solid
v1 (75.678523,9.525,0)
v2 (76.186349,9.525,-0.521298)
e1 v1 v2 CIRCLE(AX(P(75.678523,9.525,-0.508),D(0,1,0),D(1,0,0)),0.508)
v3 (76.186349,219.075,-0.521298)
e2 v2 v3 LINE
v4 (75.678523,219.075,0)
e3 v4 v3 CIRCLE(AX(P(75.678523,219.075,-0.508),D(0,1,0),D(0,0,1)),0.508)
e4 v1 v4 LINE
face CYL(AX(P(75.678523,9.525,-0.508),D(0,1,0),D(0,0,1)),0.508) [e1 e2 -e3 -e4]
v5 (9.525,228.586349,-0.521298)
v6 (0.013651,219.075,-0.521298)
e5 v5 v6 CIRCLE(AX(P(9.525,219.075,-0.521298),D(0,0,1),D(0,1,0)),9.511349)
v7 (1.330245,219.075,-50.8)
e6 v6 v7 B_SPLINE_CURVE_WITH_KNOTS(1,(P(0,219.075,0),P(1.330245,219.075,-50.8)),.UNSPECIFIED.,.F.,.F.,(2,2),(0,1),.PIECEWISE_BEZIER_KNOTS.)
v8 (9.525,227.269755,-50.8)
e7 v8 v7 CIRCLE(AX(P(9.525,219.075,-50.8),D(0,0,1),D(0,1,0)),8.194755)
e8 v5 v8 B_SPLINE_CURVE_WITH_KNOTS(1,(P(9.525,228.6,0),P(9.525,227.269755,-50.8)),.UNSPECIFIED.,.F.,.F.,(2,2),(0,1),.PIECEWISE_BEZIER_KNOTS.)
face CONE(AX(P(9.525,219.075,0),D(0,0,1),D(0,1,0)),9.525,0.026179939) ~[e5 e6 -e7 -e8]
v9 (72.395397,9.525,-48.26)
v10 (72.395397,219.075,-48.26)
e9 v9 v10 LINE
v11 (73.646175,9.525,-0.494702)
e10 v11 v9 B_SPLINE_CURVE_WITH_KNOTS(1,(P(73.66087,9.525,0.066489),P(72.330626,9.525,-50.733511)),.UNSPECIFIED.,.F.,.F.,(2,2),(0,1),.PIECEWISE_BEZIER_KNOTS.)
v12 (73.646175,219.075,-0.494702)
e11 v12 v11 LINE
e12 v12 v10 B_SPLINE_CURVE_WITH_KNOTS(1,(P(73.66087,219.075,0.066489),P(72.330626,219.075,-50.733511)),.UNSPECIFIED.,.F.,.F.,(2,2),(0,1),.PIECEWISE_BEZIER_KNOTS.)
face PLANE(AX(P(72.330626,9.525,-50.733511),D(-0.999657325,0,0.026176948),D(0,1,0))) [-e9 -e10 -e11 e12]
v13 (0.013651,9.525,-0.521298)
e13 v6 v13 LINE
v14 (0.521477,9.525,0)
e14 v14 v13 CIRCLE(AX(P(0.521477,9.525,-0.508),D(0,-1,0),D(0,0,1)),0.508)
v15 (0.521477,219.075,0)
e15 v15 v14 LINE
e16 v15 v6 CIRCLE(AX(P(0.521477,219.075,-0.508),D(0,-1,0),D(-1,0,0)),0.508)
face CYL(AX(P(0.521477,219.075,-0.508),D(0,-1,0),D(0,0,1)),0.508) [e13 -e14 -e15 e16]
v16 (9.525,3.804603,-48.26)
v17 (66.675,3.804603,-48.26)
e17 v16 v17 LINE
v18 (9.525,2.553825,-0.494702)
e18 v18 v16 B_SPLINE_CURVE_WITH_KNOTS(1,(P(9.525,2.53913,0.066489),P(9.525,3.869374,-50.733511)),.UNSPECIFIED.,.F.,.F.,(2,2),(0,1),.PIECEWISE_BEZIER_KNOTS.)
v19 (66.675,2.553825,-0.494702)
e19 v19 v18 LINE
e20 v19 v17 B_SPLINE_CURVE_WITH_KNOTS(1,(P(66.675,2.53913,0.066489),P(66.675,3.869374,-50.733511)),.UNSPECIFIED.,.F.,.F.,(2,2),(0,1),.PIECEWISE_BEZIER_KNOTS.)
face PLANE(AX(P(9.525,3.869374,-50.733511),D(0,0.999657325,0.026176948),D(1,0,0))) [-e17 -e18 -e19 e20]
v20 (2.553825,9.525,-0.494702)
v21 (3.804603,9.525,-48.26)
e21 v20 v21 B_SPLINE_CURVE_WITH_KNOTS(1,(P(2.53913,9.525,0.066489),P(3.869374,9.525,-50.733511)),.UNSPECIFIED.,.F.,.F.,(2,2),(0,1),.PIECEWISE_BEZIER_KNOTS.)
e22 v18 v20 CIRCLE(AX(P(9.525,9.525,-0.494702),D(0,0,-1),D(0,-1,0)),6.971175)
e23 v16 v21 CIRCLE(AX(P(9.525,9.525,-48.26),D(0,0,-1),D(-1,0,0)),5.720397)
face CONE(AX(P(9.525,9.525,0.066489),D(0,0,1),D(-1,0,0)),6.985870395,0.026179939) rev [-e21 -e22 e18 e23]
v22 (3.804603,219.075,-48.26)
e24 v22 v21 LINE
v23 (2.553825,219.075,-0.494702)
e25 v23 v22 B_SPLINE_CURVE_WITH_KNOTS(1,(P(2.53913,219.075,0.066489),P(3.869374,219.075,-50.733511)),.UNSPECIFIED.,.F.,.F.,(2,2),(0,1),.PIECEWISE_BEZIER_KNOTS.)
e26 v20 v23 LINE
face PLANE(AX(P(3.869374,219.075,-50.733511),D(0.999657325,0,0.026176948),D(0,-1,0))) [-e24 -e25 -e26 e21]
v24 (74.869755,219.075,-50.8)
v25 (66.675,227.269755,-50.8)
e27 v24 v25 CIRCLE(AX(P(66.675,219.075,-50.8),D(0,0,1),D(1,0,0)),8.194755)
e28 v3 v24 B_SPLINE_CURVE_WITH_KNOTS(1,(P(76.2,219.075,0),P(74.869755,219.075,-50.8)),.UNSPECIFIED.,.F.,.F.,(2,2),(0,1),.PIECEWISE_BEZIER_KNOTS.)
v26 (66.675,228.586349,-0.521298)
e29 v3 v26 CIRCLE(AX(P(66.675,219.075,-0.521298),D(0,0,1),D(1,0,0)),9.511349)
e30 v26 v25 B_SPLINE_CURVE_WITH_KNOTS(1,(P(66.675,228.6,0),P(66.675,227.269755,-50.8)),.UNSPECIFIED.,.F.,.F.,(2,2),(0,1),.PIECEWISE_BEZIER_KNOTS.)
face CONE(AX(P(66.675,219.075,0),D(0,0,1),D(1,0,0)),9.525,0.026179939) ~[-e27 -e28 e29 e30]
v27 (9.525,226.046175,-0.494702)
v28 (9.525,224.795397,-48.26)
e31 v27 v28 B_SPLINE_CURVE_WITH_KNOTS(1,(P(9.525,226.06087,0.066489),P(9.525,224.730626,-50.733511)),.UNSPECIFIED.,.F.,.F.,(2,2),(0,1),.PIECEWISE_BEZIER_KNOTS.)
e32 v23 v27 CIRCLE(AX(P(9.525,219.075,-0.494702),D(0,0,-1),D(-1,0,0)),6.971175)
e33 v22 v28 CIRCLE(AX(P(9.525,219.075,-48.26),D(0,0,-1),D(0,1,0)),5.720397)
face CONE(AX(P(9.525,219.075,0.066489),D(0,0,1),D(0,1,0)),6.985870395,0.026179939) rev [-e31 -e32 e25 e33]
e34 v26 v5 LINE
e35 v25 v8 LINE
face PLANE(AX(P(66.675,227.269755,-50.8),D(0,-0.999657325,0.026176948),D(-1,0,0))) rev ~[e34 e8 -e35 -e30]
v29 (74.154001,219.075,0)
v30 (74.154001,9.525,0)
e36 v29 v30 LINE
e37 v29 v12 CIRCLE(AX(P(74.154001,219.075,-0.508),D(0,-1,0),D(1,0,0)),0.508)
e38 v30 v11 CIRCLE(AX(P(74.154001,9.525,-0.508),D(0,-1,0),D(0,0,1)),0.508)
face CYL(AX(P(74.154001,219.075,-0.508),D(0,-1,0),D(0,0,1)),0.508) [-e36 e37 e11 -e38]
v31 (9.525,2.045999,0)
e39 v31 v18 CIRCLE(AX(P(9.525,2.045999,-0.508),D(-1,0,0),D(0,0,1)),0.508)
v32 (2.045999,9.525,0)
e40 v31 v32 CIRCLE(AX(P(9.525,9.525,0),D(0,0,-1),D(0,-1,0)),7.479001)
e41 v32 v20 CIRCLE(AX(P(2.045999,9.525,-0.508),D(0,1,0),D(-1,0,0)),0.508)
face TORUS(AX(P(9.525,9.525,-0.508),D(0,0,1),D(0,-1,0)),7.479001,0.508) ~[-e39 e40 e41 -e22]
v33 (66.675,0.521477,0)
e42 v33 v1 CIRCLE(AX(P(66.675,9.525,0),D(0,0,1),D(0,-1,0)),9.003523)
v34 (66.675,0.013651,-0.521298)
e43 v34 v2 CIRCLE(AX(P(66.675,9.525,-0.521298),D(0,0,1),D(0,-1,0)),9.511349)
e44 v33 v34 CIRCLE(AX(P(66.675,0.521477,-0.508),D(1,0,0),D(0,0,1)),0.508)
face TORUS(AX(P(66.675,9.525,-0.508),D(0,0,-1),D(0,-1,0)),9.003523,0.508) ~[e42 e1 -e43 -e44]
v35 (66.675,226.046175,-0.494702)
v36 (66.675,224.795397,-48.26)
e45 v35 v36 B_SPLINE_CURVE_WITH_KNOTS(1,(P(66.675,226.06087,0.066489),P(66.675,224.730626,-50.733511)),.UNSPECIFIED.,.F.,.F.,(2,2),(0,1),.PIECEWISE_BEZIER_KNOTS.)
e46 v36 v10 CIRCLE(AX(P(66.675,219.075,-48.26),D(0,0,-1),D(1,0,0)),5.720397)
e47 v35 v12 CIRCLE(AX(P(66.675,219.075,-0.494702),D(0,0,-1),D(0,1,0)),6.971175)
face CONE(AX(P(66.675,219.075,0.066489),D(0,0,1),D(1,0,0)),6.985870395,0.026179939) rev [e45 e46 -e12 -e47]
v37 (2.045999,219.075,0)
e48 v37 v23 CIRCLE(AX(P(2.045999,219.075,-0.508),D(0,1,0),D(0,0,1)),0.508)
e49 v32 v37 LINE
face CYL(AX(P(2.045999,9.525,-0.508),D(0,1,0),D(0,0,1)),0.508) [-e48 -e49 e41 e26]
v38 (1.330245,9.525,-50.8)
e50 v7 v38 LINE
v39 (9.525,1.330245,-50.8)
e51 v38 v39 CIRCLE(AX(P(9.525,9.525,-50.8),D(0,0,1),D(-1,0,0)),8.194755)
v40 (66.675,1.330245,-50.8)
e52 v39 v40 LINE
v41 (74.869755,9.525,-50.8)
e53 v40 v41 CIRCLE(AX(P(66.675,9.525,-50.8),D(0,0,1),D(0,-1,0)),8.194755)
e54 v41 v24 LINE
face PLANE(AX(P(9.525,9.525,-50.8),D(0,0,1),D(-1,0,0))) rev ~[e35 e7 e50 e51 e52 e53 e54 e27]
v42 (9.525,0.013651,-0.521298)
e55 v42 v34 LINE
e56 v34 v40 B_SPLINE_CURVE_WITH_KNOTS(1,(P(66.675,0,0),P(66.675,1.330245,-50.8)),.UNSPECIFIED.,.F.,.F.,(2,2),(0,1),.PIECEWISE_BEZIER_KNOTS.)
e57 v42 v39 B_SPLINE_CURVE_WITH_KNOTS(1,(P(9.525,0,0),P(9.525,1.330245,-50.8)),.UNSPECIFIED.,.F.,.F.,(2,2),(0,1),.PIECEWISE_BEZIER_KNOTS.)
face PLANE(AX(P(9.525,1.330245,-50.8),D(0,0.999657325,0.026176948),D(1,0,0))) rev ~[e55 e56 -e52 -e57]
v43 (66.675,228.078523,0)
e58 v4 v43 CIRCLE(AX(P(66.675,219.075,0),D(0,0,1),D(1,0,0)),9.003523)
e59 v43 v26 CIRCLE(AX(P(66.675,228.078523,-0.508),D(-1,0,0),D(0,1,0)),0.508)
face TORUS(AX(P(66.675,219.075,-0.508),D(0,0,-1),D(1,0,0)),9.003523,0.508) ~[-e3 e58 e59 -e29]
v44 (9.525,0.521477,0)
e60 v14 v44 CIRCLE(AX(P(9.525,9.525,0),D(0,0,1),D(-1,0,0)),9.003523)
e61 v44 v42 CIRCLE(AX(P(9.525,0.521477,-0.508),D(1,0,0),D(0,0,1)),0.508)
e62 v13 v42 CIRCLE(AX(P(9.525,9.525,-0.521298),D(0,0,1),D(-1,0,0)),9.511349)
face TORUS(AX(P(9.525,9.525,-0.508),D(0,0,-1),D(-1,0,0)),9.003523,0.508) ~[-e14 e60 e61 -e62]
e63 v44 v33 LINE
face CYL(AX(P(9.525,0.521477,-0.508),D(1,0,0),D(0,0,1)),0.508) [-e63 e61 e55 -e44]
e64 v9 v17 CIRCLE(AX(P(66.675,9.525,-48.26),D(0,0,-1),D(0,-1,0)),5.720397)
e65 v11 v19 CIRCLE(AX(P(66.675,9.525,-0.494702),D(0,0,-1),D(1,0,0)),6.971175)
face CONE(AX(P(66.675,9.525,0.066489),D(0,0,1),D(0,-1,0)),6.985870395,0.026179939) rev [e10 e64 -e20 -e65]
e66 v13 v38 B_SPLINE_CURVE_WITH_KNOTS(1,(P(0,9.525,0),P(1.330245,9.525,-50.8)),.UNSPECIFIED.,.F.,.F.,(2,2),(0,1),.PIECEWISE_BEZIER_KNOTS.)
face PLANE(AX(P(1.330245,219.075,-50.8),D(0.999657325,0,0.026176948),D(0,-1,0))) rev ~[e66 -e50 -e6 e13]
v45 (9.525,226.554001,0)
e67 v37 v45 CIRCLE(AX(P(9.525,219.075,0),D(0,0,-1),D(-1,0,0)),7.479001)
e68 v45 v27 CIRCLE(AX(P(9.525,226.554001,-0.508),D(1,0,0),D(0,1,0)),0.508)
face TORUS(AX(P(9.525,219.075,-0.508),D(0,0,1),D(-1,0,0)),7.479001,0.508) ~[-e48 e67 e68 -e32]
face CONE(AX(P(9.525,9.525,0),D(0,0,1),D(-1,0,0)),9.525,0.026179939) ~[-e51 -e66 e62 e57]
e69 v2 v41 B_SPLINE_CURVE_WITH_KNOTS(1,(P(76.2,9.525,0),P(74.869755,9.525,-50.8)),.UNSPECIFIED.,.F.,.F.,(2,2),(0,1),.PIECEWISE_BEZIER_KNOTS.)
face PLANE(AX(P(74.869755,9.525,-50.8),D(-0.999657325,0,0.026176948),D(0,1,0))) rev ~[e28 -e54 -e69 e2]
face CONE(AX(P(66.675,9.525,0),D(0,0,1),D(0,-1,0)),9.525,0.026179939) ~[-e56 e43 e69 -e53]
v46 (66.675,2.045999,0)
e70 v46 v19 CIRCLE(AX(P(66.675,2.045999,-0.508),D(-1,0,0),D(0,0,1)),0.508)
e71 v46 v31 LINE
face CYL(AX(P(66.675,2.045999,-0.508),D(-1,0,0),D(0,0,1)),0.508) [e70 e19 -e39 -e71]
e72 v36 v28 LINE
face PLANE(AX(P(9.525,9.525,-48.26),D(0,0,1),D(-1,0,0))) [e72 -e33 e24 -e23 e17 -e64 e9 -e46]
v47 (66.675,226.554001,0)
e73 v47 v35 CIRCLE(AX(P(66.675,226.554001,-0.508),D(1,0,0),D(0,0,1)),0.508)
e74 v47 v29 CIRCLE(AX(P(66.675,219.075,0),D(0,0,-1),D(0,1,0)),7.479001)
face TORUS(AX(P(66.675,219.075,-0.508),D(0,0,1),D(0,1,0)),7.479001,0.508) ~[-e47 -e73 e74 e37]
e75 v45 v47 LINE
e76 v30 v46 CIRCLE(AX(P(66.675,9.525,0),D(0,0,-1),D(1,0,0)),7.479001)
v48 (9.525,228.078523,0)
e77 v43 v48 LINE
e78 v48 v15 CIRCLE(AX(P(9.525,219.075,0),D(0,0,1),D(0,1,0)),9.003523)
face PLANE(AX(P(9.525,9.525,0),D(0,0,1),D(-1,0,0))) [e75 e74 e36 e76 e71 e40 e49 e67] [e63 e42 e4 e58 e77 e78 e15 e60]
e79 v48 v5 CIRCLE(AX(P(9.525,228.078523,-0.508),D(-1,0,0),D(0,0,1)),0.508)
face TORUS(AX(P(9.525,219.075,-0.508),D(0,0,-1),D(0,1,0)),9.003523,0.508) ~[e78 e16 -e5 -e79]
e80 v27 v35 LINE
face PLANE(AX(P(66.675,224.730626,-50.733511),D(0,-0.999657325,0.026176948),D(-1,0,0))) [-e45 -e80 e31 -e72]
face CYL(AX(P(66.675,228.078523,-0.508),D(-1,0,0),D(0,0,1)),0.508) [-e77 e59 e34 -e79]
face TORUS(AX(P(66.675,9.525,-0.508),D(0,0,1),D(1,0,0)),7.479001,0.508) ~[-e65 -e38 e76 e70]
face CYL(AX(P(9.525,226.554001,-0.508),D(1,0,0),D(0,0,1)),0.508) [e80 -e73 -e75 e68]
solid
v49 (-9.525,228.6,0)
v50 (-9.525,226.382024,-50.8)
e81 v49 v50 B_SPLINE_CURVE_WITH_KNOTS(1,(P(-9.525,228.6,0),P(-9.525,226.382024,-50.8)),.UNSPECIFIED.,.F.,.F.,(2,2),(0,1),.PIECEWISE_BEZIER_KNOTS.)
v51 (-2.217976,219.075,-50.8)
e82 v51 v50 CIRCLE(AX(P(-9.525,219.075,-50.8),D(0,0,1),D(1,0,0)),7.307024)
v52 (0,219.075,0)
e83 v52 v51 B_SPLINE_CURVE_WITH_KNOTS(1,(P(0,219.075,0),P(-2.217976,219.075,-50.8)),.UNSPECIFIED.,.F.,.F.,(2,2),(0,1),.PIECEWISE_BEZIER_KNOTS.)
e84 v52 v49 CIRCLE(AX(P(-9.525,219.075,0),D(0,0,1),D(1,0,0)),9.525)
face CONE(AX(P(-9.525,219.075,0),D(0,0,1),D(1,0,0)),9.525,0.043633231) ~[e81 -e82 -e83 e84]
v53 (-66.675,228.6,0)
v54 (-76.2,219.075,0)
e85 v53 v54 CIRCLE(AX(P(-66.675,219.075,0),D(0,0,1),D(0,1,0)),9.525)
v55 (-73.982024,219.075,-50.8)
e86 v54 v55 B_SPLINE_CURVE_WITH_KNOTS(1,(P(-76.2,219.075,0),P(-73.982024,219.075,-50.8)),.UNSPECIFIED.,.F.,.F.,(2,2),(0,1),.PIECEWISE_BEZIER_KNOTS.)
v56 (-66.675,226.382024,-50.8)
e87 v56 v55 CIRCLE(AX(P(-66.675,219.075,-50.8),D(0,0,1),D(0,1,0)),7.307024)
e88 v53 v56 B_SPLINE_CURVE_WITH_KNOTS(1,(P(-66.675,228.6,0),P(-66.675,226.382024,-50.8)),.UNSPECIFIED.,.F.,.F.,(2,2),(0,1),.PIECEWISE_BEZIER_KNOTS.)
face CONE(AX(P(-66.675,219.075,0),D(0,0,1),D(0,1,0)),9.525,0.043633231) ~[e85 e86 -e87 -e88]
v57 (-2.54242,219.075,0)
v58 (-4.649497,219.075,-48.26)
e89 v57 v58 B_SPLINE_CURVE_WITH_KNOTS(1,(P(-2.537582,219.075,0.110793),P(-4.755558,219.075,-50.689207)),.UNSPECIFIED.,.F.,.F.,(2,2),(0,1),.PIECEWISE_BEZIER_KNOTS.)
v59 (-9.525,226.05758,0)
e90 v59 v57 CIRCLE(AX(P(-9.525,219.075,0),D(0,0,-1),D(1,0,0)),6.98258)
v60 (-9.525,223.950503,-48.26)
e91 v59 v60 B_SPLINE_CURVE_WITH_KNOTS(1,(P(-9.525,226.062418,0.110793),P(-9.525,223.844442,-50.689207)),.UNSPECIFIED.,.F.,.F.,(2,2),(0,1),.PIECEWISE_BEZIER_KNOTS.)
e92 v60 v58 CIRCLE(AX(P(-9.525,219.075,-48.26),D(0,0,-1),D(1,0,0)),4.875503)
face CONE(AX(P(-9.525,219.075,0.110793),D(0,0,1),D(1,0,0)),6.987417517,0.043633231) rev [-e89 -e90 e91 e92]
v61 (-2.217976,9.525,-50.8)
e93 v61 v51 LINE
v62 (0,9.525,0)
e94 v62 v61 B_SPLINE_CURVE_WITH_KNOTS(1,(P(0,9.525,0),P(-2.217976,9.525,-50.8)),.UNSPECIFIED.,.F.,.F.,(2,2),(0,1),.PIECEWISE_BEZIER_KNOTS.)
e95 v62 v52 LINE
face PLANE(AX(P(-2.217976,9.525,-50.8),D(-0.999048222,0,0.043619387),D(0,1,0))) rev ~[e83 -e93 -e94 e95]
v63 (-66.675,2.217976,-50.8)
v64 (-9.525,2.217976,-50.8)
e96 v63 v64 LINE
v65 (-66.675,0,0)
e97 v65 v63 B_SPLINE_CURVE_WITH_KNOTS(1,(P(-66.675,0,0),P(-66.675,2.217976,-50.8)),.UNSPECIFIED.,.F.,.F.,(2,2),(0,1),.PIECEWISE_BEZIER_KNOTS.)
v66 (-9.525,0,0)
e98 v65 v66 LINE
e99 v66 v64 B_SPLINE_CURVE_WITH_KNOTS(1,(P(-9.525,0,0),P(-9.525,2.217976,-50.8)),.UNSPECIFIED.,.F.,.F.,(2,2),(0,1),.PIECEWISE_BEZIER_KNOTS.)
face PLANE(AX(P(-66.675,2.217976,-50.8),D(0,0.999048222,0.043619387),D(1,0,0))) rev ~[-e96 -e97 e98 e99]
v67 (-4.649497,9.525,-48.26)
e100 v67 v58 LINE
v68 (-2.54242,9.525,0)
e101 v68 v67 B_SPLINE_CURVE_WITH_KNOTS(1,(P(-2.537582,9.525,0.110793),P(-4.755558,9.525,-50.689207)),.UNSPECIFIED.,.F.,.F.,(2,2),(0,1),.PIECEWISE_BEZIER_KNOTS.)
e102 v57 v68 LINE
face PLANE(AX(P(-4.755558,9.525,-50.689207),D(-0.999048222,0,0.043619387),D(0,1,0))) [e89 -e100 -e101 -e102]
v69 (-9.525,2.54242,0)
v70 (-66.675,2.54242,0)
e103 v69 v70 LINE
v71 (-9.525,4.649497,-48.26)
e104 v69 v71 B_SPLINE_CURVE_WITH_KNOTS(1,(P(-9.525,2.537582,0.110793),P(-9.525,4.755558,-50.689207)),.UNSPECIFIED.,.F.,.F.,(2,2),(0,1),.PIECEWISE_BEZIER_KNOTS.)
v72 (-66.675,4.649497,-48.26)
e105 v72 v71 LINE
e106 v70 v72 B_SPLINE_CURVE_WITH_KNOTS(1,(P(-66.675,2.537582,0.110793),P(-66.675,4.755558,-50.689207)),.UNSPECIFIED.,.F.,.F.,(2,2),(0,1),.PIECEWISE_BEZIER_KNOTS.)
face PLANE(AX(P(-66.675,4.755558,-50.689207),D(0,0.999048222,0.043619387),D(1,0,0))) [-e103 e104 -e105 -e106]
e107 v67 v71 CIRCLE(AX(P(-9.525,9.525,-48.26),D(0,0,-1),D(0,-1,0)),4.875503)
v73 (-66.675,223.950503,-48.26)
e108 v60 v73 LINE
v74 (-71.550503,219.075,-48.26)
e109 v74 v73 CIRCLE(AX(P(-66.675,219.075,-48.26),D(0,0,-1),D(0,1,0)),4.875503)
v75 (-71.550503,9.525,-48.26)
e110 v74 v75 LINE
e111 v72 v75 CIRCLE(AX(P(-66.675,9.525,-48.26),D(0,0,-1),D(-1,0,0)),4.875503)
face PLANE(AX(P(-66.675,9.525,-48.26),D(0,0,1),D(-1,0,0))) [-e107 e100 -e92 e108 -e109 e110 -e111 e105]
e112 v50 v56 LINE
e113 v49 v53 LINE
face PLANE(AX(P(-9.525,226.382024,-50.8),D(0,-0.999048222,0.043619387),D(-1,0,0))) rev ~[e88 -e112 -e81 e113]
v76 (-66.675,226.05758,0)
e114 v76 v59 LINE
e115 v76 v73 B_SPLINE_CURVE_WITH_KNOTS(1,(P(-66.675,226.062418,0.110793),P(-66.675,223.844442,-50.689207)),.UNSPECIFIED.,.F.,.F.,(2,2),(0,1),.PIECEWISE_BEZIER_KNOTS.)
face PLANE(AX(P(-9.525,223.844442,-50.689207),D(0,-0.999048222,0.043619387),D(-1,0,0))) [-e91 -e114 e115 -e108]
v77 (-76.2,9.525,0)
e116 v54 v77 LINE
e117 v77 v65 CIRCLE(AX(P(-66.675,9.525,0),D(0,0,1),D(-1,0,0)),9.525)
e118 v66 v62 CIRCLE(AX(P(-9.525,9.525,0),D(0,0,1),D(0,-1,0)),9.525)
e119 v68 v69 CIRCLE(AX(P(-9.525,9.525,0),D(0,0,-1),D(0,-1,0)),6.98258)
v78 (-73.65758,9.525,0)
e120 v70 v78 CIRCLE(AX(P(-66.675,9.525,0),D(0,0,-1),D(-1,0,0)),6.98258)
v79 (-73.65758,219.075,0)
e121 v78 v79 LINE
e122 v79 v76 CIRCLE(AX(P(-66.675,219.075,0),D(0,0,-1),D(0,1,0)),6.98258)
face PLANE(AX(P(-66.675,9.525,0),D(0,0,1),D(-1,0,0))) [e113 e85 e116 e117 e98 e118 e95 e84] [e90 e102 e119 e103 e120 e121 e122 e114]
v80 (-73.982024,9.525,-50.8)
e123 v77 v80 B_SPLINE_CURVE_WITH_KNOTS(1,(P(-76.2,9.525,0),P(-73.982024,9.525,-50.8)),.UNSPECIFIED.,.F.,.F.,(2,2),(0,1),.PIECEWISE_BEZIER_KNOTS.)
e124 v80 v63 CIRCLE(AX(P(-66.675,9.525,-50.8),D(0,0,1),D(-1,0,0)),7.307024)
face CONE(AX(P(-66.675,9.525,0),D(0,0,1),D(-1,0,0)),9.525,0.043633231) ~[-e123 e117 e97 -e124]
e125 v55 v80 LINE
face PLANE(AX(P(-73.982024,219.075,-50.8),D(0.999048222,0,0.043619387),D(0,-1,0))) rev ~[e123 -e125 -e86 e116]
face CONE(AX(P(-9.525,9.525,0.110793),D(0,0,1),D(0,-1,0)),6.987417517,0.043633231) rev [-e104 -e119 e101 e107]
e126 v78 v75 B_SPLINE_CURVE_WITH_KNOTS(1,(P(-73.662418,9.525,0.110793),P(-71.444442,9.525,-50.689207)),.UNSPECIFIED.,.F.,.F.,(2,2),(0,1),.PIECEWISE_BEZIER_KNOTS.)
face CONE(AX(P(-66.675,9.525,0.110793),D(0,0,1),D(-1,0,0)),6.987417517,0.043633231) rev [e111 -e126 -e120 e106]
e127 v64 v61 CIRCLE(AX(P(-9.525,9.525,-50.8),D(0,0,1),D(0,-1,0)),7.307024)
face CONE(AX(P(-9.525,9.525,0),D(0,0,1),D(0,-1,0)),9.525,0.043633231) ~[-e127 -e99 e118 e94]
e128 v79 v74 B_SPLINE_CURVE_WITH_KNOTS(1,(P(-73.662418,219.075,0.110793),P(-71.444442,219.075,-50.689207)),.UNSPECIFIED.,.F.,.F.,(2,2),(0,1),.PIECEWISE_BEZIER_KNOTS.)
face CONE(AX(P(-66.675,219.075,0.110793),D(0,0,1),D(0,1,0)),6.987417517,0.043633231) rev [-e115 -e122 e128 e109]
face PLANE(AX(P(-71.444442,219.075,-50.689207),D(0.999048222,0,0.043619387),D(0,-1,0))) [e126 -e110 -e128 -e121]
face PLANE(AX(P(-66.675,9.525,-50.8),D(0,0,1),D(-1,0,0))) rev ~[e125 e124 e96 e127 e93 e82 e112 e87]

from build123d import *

# Parameters (mm, degrees)
F1_DEPTH = 50.8
F1_TAPER = 1.5
F2_T     = 2.54
F3_R     = 0.508
F5_DEPTH = 50.8
F5_TAPER = 2.5
F6_T     = 2.54


# Not quite as in the source:
# - a shell that OpenCascade refuses in one call is made with other operations: the cavity is built on its own and cut out


with BuildPart() as f1:
    # F0 (on Top) → F1 (new body)
    with BuildSketch(Plane.XY):
        with BuildLine():
            ThreePointArc((0, 9.525), (2.7898079092, 2.7898079092), (9.525, 0))
            Line((9.525, 0), (66.675, 0))
            ThreePointArc((66.675, 0), (73.4101920908, 2.7898079092), (76.2, 9.525))
            Line((76.2, 9.525), (76.2, 219.075))
            ThreePointArc((76.2, 219.075), (73.4101920908, 225.8101920908), (66.675, 228.6))
            Line((66.675, 228.6), (9.525, 228.6))
            ThreePointArc((9.525, 228.6), (2.7898079092, 225.8101920908), (0, 219.075))
            Line((0, 219.075), (0, 9.525))
        make_face()
    extrude(amount=-F1_DEPTH, taper=F1_TAPER)

    # F2: shell of thickness 2.54, made by hand


with BuildPart() as f2_core1:
    # F2_t2: copy of F1
    add(f1.part)

    # the walls: a layer under each face that stays
    f2_faces = [f2_core1.faces().sort_by_distance(p)[0] for p in [
        (0.6651224079, 114.3, -25.4),
        (3.2601204741, 3.2601204741, -25.4),
        (38.1, 0.6651224079, -25.4),
        (72.9398795259, 3.2601204741, -25.4),
        (75.5348775921, 114.3, -25.4),
        (72.9398795259, 225.3398795259, -25.4),
        (38.1, 227.9348775921, -25.4),
        (3.2601204741, 225.3398795259, -25.4),
        (38.1, 114.3, -50.8),
    ]]
    thicken(f2_faces, amount=-F2_T, mode=Mode.SUBTRACT)


with BuildPart() as f1_1:
    add(f1.part)

    # what is left inside the walls is the cavity
    f2_cavity = [f2_core1.part.solids().sort_by_distance(p)[0] for p in [
        (38.1, 151.553043, -0.0254),
    ]]
    add(f2_cavity, mode=Mode.SUBTRACT)

    # F3
    f3_edges = [f1_1.edges().sort_by_distance(p)[0] for p in [
        (38.1, 0, 0),
        (73.410192, 2.789808, 0),
        (76.2, 114.3, 0),
        (2.789808, 2.789808, 0),
        (0, 114.3, 0),
        (2.789808, 225.810192, 0),
        (38.1, 228.6, 0),
        (73.410192, 225.810192, 0),
        (38.1, 2.540871, 0),
        (73.659129, 114.3, 0),
        (38.1, 226.059129, 0),
        (2.540871, 114.3, 0),
        (71.613525, 4.586475, 0),
        (4.586475, 4.586475, 0),
        (71.613525, 224.013525, 0),
        (4.586475, 224.013525, 0),
    ]]
    fillet(f3_edges, radius=F3_R)


with BuildPart() as f5:
    # F4 (on Top) → F5 (new body)
    with BuildSketch(Plane.XY):
        with BuildLine():
            ThreePointArc((-76.2, 9.525), (-73.4101920908, 2.7898079092), (-66.675, 0))
            Line((-66.675, 0), (-9.525, 0))
            ThreePointArc((-9.525, 0), (-2.7898079092, 2.7898079092), (0, 9.525))
            Line((0, 9.525), (0, 219.075))
            ThreePointArc((0, 219.075), (-2.7898079092, 225.8101920908), (-9.525, 228.6))
            Line((-9.525, 228.6), (-66.675, 228.6))
            ThreePointArc((-66.675, 228.6), (-73.4101920908, 225.8101920908), (-76.2, 219.075))
            Line((-76.2, 219.075), (-76.2, 9.525))
        make_face()
    extrude(amount=-F5_DEPTH, taper=F5_TAPER)

    # F6: shell of thickness 2.54, made by hand


with BuildPart() as f6_core1:
    # F6_t2: copy of F5
    add(f5.part)

    # the walls: a layer under each face that stays
    f6_faces = [f6_core1.faces().sort_by_distance(p)[0] for p in [
        (-75.0910120501, 114.3, -25.4),
        (-72.6260191912, 3.5739808088, -25.4),
        (-38.1, 1.1089879499, -25.4),
        (-3.5739808088, 3.5739808088, -25.4),
        (-1.1089879499, 114.3, -25.4),
        (-3.5739808088, 225.0260191912, -25.4),
        (-38.1, 227.4910120501, -25.4),
        (-72.6260191912, 225.0260191912, -25.4),
        (-38.1, 114.3, -50.8),
    ]]
    thicken(f6_faces, amount=-F6_T, mode=Mode.SUBTRACT)


with BuildPart() as f5_1:
    add(f5.part)

    # what is left inside the walls is the cavity
    f6_cavity = [f6_core1.part.solids().sort_by_distance(p)[0] for p in [
        (-38.1, 151.552527, -0.0254),
    ]]
    add(f6_cavity, mode=Mode.SUBTRACT)


solid = Compound([f1_1.part, f5_1.part])
